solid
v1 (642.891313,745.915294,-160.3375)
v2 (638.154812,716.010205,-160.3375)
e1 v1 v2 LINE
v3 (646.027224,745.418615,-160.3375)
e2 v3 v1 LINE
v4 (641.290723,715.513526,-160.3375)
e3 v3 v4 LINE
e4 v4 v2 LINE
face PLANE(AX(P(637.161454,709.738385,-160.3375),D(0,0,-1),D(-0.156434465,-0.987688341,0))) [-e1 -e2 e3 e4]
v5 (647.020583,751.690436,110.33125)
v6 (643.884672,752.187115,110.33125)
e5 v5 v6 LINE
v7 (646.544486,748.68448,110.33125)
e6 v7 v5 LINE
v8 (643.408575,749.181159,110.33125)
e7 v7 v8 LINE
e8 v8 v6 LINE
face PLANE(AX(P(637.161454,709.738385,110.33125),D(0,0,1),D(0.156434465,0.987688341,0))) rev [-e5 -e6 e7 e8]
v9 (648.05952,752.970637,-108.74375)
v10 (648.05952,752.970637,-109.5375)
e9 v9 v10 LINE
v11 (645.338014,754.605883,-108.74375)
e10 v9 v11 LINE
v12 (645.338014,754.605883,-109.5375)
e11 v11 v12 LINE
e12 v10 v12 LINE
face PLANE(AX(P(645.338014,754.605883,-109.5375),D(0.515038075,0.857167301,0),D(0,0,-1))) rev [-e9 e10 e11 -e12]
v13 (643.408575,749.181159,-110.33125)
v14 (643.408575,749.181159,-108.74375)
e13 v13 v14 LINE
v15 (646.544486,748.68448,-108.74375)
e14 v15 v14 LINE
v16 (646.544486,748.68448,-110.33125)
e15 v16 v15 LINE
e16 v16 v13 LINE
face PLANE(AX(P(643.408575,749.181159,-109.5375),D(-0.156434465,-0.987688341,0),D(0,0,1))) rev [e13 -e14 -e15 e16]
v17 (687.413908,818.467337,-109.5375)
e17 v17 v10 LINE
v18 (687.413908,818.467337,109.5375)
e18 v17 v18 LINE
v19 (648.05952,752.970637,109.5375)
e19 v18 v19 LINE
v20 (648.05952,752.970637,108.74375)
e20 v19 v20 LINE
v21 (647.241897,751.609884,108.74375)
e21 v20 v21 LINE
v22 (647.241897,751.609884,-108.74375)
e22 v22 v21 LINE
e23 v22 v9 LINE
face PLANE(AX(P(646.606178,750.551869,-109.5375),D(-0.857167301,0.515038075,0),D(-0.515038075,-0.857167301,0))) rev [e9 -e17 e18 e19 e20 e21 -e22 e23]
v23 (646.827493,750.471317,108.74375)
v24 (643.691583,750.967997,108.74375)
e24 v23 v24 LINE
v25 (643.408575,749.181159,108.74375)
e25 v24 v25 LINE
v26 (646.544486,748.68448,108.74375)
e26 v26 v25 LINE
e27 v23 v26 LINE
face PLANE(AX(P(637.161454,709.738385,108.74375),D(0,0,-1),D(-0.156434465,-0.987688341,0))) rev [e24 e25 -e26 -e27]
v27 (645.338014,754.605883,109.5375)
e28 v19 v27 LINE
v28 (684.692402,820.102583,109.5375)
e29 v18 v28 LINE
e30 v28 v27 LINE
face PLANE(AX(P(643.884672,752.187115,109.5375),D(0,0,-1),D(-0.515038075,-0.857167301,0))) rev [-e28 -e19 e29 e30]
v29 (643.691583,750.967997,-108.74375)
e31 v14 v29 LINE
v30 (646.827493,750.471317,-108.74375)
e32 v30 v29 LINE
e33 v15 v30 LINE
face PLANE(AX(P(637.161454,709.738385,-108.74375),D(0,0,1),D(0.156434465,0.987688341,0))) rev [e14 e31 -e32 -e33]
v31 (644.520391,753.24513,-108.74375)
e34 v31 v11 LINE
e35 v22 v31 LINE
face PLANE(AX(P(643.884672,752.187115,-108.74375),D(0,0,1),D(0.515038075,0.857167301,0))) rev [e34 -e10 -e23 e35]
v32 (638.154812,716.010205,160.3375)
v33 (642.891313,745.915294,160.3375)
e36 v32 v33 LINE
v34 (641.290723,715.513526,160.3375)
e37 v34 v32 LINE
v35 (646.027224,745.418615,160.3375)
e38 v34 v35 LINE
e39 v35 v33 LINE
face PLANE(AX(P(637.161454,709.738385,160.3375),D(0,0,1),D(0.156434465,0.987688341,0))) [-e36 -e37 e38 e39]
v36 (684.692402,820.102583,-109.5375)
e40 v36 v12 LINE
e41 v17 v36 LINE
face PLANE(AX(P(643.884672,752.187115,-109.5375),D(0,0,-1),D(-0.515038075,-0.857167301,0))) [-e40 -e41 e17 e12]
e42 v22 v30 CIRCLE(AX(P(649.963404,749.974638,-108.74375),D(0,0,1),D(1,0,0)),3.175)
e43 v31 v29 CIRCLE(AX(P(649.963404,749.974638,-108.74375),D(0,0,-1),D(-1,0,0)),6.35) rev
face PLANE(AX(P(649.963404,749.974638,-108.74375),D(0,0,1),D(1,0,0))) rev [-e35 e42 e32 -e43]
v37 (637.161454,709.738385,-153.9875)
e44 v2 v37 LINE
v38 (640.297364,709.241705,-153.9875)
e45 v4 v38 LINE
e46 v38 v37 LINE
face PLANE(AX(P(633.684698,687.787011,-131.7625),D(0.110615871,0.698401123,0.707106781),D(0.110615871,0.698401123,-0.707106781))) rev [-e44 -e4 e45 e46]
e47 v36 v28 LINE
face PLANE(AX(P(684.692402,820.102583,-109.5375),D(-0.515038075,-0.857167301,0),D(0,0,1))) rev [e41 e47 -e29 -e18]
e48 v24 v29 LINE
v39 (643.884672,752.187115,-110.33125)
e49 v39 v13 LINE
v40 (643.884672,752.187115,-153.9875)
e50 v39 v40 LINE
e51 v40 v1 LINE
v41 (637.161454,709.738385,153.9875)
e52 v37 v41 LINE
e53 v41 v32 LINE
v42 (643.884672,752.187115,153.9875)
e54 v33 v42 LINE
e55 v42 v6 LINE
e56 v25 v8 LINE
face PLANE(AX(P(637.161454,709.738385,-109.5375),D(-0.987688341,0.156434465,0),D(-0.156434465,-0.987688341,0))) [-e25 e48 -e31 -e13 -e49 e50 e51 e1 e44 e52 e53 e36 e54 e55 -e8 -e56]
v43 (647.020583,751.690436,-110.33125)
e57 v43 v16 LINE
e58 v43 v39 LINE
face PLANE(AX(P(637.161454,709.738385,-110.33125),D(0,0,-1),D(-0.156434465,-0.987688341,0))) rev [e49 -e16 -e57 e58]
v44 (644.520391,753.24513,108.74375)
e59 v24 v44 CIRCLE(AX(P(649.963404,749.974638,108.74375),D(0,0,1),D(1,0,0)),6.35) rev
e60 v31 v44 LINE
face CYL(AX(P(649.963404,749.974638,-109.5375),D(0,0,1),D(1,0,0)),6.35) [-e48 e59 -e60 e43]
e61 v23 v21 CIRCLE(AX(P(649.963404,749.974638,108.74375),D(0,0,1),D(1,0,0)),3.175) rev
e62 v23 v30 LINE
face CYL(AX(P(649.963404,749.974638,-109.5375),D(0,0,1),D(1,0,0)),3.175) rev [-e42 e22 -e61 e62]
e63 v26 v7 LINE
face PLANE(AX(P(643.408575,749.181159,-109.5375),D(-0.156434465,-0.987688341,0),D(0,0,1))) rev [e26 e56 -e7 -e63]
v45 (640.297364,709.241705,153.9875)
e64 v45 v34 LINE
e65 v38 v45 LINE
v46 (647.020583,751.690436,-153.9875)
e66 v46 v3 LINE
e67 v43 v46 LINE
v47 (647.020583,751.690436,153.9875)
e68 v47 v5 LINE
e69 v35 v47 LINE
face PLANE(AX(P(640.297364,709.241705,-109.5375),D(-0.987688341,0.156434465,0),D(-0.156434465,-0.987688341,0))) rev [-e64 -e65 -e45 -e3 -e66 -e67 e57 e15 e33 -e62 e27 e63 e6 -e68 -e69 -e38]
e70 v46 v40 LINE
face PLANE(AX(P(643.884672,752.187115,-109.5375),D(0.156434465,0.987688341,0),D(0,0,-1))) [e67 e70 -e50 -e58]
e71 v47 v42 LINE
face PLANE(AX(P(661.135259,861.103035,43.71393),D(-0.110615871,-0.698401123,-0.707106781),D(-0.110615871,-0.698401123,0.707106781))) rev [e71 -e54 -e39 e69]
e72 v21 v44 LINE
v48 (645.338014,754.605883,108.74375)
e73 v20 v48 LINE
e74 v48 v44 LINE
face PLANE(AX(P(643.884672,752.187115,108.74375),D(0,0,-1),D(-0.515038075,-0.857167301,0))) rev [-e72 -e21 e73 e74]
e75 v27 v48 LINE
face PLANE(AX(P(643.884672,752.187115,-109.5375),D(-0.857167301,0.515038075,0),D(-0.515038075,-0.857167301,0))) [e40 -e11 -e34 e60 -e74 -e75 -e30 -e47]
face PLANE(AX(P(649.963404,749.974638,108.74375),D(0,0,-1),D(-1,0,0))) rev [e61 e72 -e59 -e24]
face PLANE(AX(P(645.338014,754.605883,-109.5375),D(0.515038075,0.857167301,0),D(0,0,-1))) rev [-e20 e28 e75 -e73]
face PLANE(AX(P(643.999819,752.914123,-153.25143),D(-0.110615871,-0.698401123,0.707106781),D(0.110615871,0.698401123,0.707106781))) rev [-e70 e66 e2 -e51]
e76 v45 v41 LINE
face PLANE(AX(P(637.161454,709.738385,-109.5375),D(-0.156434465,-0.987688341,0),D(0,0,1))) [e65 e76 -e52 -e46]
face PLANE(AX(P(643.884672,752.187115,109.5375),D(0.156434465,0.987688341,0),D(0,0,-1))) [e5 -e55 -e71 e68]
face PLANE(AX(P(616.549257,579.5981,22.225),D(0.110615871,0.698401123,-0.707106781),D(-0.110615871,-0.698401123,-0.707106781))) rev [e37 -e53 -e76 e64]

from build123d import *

# Parameters (mm, degrees)
BOSS_EXTRUDE1_DEPTH      = 109.5375
BOSS_EXTRUDE1_DEPTH_BACK = 109.5375
SKETCH2_W                = 50.8
SKETCH2_H                = 42.97785953
BOSS_EXTRUDE2_DEPTH      = 3.175
CHAMFER1_SIZE            = 6.35
CONVERT_SOLID1_START     = -110.33125
CONVERT_SOLID1_DEPTH     = 220.6625
CONVERT_SOLID1_2_DEPTH   = 1.5875
CONVERT_SOLID1_START_2   = 108.74375
CONVERT_SOLID1_3_DEPTH   = 1.5875
CONVERT_SOLID1_START_3   = -108.74375
CONVERT_SOLID1_4_DEPTH   = 217.4875


# Read off the part's stored shape, not the designer's step: Convert-Solid1
with BuildPart() as part:
    # Sketch1 → Boss-Extrude1 (new, two sides: drawn at the far end of the back side and taken through both)
    with BuildSketch(Plane.XY.offset(-BOSS_EXTRUDE1_DEPTH_BACK)):
        Polygon((640.29736406, 709.2417051), (646.924037824, 751.080876614), (687.413907929, 818.467336674), (684.69240175, 820.102582562), (643.884672043, 752.187115289), (637.161453578, 709.738384527), align=None)
    extrude(amount=BOSS_EXTRUDE1_DEPTH + BOSS_EXTRUDE1_DEPTH_BACK)

    # Sketch2 → Boss-Extrude2 (add)
    with BuildSketch(Plane(origin=(511.908391779, -81.078324129, 0), x_dir=(0, 0, 1), z_dir=(-0.9876883405951397, 0.1564344650402187, 0))):
        with Locations((-134.9375, 822.16326817)):
            Rectangle(SKETCH2_W, SKETCH2_H)
        with Locations((134.9375, 822.16326817)):
            Rectangle(SKETCH2_W, SKETCH2_H)
    extrude(amount=-BOSS_EXTRUDE2_DEPTH)

    # Chamfer1
    chamfer1_edges = [part.edges().sort_by_distance(p)[0] for p in [
        (645.452627283, 751.938775576, -160.3375),
        (638.729408819, 709.490044814, -160.3375),
        (645.452627283, 751.938775576, 160.3375),
        (638.729408819, 709.490044814, 160.3375),
    ]]
    chamfer(chamfer1_edges, length=CHAMFER1_SIZE)

    # Convert-Solid1 outline → Convert-Solid1 (cut)
    with BuildSketch(Plane.XY.offset(CONVERT_SOLID1_START)):
        with BuildLine():
            Line((644.520391245, 753.245129714), (643.884672043, 752.187115289))
            Line((643.884672043, 752.187115289), (643.691582642, 750.967996791))
            ThreePointArc((643.691582642, 750.967996791), (643.996355462, 752.146465849), (644.520391245, 753.245129714))
        make_face()
    extrude(amount=CONVERT_SOLID1_DEPTH, mode=Mode.SUBTRACT)

    # Convert-Solid1 2 outline → Convert-Solid1 2 (cut)
    with BuildSketch(Plane.XY.offset(CONVERT_SOLID1_START)):
        with BuildLine():
            Line((647.241897425, 751.609883826), (648.059520369, 752.970636916))
            Line((648.059520369, 752.970636916), (645.338014189, 754.605882804))
            Line((645.338014189, 754.605882804), (644.520391245, 753.245129714))
            ThreePointArc((644.520391245, 753.245129714), (643.996355462, 752.146465849), (643.691582642, 750.967996791))
            Line((643.691582642, 750.967996791), (643.408575407, 749.181159432))
            Line((643.408575407, 749.181159432), (646.544485888, 748.684480005))
            Line((646.544485888, 748.684480005), (646.924037824, 751.080876614))
            Line((646.924037824, 751.080876614), (647.241897425, 751.609883826))
        make_face()
    extrude(amount=CONVERT_SOLID1_2_DEPTH, mode=Mode.SUBTRACT)

    # Convert-Solid1 3 outline → Convert-Solid1 3 (cut)
    with BuildSketch(Plane.XY.offset(CONVERT_SOLID1_START_2)):
        with BuildLine():
            Line((647.241897425, 751.609883826), (648.059520369, 752.970636916))
            Line((648.059520369, 752.970636916), (645.338014189, 754.605882804))
            Line((645.338014189, 754.605882804), (644.520391245, 753.245129714))
            ThreePointArc((644.520391245, 753.245129714), (643.996355462, 752.146465849), (643.691582642, 750.967996791))
            Line((643.691582642, 750.967996791), (643.408575407, 749.181159432))
            Line((643.408575407, 749.181159432), (646.544485888, 748.684480005))
            Line((646.544485888, 748.684480005), (646.924037824, 751.080876614))
            Line((646.924037824, 751.080876614), (647.241897425, 751.609883826))
        make_face()
    extrude(amount=CONVERT_SOLID1_3_DEPTH, mode=Mode.SUBTRACT)

    # Convert-Solid1 4 outline → Convert-Solid1 4 (add)
    with BuildSketch(Plane.XY.offset(CONVERT_SOLID1_START_3)):
        with BuildLine():
            ThreePointArc((646.827493123, 750.471317365), (646.979879533, 751.060551894), (647.241897425, 751.609883826))
            Line((647.241897425, 751.609883826), (646.924037824, 751.080876614))
            Line((646.924037824, 751.080876614), (646.827493123, 750.471317365))
        make_face()
    extrude(amount=CONVERT_SOLID1_4_DEPTH)


solid = part.part
